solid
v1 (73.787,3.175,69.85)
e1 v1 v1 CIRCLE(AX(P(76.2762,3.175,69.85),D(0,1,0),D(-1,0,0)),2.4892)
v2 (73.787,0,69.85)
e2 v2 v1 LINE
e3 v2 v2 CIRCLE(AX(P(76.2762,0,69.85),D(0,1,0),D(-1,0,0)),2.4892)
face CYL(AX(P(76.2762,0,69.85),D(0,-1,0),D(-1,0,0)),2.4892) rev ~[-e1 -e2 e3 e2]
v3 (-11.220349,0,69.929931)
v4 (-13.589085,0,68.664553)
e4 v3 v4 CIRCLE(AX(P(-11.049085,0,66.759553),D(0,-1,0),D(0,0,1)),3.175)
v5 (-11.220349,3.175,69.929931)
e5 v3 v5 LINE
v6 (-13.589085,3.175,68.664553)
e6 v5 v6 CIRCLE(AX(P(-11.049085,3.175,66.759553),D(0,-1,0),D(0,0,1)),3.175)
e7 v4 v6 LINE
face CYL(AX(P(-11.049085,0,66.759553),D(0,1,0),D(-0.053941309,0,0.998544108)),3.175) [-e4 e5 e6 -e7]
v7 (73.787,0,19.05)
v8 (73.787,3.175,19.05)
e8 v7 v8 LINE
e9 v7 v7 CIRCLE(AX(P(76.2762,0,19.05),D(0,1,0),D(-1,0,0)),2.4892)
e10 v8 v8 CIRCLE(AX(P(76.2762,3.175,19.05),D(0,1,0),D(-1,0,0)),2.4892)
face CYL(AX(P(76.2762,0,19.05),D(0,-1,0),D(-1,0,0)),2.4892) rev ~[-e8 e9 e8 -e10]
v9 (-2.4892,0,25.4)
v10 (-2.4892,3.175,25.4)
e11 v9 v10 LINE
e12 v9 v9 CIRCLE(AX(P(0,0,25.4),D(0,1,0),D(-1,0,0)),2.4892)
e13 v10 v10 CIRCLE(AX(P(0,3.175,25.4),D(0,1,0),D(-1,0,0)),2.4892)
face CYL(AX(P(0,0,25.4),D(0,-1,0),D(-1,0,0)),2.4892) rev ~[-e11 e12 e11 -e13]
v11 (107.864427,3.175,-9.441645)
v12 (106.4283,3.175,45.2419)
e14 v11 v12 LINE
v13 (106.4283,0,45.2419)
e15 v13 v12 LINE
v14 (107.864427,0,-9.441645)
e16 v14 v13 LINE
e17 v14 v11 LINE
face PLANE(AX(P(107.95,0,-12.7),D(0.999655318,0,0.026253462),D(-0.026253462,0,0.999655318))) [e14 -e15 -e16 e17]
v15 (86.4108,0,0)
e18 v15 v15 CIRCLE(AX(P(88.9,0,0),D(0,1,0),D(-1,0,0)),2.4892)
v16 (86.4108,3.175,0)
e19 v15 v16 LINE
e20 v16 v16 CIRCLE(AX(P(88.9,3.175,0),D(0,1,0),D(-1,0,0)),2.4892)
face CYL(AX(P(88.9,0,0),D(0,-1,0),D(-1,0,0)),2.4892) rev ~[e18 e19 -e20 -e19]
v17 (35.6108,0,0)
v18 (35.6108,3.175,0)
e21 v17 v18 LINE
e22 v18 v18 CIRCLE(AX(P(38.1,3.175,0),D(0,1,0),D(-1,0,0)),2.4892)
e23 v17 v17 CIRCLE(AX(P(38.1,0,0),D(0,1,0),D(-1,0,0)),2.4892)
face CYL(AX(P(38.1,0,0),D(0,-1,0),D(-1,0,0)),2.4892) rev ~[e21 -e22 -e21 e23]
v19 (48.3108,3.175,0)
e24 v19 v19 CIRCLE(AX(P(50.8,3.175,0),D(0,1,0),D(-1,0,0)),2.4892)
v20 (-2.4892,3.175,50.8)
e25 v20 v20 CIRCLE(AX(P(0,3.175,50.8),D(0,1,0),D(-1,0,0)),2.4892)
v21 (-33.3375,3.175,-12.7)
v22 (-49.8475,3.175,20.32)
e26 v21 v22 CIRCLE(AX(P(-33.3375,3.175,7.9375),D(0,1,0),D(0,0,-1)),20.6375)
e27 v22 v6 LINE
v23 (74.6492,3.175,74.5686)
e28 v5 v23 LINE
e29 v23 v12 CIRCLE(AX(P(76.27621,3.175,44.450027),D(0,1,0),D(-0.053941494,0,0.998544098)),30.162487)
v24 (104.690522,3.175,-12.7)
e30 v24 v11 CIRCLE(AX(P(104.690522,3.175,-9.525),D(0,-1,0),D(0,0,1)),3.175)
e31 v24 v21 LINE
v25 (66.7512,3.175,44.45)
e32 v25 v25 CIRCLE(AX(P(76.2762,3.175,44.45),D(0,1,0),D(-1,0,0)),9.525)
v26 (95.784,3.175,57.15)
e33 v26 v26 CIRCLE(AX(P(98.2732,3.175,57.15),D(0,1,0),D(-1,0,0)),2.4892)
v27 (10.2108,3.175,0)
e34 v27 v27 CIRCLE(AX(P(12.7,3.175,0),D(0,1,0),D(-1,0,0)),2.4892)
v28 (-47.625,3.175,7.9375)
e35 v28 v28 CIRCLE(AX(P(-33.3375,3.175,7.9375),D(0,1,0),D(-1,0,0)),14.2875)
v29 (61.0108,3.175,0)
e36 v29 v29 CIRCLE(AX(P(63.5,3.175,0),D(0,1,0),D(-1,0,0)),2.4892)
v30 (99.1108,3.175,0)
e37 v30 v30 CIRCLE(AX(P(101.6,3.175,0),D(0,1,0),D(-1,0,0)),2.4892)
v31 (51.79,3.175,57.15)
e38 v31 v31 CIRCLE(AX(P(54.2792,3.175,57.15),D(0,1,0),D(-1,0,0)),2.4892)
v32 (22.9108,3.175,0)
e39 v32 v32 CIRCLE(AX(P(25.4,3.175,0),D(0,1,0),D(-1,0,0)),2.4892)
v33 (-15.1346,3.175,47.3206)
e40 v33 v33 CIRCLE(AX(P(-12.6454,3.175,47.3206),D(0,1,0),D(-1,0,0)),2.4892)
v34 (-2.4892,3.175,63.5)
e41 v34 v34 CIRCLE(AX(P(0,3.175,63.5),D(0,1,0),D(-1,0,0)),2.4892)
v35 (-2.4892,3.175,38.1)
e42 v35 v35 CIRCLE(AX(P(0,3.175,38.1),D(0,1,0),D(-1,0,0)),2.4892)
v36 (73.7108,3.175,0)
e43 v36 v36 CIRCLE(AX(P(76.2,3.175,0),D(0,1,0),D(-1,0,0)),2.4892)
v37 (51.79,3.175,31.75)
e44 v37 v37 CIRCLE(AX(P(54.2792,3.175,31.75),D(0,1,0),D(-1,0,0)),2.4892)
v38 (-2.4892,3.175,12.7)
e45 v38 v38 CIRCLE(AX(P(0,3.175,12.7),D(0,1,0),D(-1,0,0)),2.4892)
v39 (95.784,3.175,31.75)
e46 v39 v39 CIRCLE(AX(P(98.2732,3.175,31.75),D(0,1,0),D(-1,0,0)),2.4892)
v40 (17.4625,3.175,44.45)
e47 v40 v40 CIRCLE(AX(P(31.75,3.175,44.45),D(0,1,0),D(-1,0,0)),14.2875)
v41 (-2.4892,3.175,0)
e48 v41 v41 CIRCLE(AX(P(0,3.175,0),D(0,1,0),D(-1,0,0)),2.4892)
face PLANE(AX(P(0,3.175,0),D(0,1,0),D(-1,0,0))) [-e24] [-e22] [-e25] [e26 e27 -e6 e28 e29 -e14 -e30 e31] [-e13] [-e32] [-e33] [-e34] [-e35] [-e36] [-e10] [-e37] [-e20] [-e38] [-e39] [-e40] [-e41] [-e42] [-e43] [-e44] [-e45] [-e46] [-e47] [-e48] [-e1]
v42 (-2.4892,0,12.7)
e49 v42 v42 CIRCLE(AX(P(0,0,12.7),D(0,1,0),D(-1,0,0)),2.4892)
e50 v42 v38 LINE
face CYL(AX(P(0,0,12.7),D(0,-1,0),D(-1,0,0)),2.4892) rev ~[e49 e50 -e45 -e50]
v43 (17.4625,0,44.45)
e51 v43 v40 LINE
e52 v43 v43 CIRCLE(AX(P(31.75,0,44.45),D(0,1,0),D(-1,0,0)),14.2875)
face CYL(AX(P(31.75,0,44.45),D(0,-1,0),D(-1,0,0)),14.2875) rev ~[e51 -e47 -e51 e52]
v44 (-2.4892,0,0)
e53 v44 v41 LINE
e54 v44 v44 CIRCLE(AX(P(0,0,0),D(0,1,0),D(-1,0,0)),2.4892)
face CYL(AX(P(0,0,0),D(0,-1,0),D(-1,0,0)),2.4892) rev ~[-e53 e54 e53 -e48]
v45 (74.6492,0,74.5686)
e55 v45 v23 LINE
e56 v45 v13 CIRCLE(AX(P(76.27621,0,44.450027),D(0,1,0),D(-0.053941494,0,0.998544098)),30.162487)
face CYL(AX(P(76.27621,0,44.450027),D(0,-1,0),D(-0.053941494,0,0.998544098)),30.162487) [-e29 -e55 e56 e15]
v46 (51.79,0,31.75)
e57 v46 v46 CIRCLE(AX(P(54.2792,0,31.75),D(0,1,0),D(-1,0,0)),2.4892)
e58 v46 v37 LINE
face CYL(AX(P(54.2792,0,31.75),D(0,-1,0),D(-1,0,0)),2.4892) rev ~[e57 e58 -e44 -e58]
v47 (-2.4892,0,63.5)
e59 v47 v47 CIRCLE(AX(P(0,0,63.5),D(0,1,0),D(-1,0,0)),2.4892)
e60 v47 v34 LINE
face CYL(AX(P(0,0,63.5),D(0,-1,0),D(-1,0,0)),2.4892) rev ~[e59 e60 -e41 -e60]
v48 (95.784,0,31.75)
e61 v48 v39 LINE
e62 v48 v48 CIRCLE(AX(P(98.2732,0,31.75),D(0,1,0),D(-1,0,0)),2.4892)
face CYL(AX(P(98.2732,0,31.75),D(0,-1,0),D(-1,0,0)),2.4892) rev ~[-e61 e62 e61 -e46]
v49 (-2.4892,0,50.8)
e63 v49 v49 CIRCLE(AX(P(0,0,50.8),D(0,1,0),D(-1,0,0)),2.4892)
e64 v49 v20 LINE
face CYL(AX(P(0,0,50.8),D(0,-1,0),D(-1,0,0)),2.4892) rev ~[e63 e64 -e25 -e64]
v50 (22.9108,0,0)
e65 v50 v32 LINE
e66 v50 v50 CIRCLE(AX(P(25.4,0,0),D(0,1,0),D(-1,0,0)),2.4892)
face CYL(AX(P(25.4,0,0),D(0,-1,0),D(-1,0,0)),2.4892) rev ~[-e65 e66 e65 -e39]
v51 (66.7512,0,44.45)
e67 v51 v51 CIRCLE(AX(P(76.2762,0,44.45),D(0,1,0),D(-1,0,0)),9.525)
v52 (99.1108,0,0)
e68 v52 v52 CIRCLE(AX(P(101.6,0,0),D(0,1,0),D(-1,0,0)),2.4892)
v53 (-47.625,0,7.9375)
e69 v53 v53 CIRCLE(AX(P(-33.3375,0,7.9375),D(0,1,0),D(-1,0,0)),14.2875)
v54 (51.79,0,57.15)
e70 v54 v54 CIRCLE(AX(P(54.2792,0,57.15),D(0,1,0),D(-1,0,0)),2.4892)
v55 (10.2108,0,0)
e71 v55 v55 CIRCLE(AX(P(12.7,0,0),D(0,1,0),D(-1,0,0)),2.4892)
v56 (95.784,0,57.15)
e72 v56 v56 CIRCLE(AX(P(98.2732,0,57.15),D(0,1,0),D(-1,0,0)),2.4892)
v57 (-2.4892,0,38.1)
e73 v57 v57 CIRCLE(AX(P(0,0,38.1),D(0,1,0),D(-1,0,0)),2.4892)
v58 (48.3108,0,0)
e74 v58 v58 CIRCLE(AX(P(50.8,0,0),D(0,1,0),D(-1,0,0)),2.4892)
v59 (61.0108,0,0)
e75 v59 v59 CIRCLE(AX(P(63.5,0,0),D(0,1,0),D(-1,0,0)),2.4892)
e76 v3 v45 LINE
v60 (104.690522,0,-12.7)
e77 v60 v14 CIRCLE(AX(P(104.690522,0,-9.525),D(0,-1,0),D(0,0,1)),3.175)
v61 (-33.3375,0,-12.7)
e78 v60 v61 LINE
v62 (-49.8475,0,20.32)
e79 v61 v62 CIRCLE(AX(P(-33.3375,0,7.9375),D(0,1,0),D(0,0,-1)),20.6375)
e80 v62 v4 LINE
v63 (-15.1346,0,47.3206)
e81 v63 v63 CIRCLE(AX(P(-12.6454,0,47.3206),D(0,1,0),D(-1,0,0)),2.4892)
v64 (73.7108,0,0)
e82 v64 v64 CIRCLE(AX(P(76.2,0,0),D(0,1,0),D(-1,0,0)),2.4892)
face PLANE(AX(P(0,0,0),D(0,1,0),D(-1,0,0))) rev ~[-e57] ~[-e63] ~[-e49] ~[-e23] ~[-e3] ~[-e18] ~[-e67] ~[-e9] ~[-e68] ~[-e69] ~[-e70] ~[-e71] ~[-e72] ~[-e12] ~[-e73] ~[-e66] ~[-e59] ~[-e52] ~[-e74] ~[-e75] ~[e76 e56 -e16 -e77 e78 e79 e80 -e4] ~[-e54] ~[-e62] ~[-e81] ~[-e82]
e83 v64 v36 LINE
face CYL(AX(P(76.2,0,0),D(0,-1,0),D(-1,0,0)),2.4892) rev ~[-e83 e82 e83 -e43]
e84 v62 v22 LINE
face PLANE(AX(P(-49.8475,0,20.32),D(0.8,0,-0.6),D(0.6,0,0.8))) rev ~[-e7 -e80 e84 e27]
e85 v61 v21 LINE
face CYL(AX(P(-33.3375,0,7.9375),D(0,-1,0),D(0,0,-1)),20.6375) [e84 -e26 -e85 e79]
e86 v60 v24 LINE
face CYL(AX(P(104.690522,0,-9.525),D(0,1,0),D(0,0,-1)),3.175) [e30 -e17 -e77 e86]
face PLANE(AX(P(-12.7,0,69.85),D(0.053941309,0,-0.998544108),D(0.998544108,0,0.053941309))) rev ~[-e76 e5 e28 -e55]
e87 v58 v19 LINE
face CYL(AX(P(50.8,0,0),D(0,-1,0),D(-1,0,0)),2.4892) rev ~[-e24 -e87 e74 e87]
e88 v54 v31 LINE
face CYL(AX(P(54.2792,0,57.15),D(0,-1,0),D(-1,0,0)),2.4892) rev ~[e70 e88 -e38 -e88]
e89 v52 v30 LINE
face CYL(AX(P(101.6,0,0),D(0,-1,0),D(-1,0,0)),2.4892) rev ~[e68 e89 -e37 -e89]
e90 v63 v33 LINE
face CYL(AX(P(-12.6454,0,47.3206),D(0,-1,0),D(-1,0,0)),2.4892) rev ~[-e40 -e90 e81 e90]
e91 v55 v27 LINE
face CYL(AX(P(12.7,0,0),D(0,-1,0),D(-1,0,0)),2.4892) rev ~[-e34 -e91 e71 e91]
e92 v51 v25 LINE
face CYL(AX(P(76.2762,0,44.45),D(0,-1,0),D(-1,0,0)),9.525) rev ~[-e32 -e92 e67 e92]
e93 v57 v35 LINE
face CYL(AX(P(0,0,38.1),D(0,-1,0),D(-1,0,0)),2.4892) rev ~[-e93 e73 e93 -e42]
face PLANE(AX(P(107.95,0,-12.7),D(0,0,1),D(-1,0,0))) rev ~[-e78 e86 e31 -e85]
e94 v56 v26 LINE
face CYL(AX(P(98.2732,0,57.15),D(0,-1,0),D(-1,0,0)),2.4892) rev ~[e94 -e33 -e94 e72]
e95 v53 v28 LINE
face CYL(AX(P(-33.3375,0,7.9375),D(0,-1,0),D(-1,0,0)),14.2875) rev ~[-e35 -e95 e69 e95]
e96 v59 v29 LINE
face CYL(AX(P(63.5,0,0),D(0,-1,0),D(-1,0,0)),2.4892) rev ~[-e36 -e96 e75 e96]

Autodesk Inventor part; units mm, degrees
ref_plane "YZ Plane" through (0, 0, 0) normal (1, 0, 0) x (0, 1, 0)
ref_plane "XZ Plane" through (0, 0, 0) normal (0, 1, 0) x (-1, 0, 0)
ref_plane "XY Plane" through (0, 0, 0) normal (0, 0, 1) x (1, 0, 0)
sketch "CIM" plane through (0, 0, 0) normal (0, 0, 1) x (1, 0, 0)
  circle A0 centre (0, 0) radius 32.004
  circle A1 centre (0, 0) radius 9.525
  circle A2 centre (0, 25.4) radius 2.4892
  circle A3 centre (0, -25.4) radius 2.4892
  dimension "d0" = 64.008
  dimension "d1" = 19.05
  dimension "d2" = 4.9784
  dimension "d5" = 360
  dimension "d7" = 50.8
sketch "VersaKey Patern" plane through (0, 0, 0) normal (0, 0, 1) x (1, 0, 0)
  circle A0 centre (20.6222, 11.9063) radius 2.15
  arc A1 (5.2753, 19.7857) -> (5.9367, 18.5743) centre (6.2412, 19.5268) ccw
  arc A2 (13.1353, 14.4122) -> (14.5161, 14.4442) centre (13.809, 15.1513) ccw
  arc A3 (13.1353, 14.4122) -> (5.9367, 18.5743) centre (0, 0) ccw
  line L0 (5.2753, 19.7857) -> (6.3115, 23.653)
  line L1 (17.347, 17.2752) -> (14.5161, 14.4442)
  arc A4 (7.5745, 24.3491) -> (6.3115, 23.653) centre (7.2774, 23.3942) ccw
  arc A5 (17.3191, 18.7163) -> (7.5745, 24.3491) centre (0, 0) ccw
  arc A6 (17.347, 17.2752) -> (17.3191, 18.7163) centre (16.6399, 17.9823) ccw
  circle A7 centre (-20.6222, 11.9062) radius 2.15
  arc A8 (-14.4973, 14.4613) -> (-13.1175, 14.4285) centre (-13.7902, 15.1684) ccw
  arc A9 (-5.9137, 18.5817) -> (-13.1175, 14.4285) centre (0, 0) ccw
  line L2 (-14.4973, 14.4613) -> (-17.3284, 17.2924)
  arc A10 (-5.9137, 18.5817) -> (-5.251, 19.7934) centre (-6.217, 19.5346) ccw
  arc A11 (-17.2997, 18.7342) -> (-17.3284, 17.2924) centre (-16.6213, 17.9996) ccw
  circle A12 centre (0, 23.8125) radius 2.15
  line L3 (-6.2872, 23.6606) -> (-5.251, 19.7934)
  arc A13 (-7.5492, 24.3569) -> (-17.2997, 18.7342) centre (0, 0) ccw
  arc A14 (-6.2872, 23.6606) -> (-7.5492, 24.3569) centre (-7.2532, 23.4017) ccw
  circle A15 centre (20.6222, -11.9062) radius 2.15
  circle A16 centre (0, -23.8125) radius 2.15
  circle A17 centre (-20.6222, -11.9063) radius 2.15
  arc A18 (-13.1353, -14.4122) -> (-14.5161, -14.4442) centre (-13.809, -15.1513) ccw
  arc A19 (5.9137, -18.5817) -> (5.251, -19.7934) centre (6.217, -19.5346) ccw
  line L4 (6.2872, -23.6606) -> (5.251, -19.7934)
  arc A20 (-13.1353, -14.4122) -> (-5.9367, -18.5743) centre (0, 0) ccw
  arc A21 (-5.2753, -19.7857) -> (-5.9367, -18.5743) centre (-6.2412, -19.5268) ccw
  line L5 (-5.2753, -19.7857) -> (-6.3115, -23.653)
  arc A22 (-7.5745, -24.3491) -> (-6.3115, -23.653) centre (-7.2774, -23.3942) ccw
  arc A23 (-17.347, -17.2752) -> (-17.3191, -18.7163) centre (-16.6399, -17.9823) ccw
  arc A24 (-17.3191, -18.7163) -> (-7.5745, -24.3491) centre (0, 0) ccw
  line L6 (-17.347, -17.2752) -> (-14.5161, -14.4442)
  arc A25 (14.4973, -14.4613) -> (13.1175, -14.4285) centre (13.7902, -15.1684) ccw
  arc A26 (5.9137, -18.5817) -> (13.1175, -14.4285) centre (0, 0) ccw
  line L7 (14.4973, -14.4613) -> (17.3284, -17.2924)
  arc A27 (17.2997, -18.7342) -> (17.3284, -17.2924) centre (16.6213, -17.9996) ccw
  arc A28 (7.5492, -24.3569) -> (17.2997, -18.7342) centre (0, 0) ccw
  arc A29 (6.2872, -23.6606) -> (7.5492, -24.3569) centre (7.2532, -23.4017) ccw
  arc A30 (-19.049, 4.1694) -> (-19.7671, 5.3492) centre (-20.0259, 4.3832) ccw
  arc A31 (-19.049, 4.1694) -> (-19.0542, -4.1458) centre (0, 0) ccw
  arc A32 (-19.7725, -5.3243) -> (-19.0542, -4.1458) centre (-20.0313, -4.3584) ccw
  line L8 (-23.6343, 6.3854) -> (-19.7671, 5.3492)
  arc A33 (-23.6343, 6.3854) -> (-24.8683, 5.6407) centre (-23.8931, 5.4194) ccw
  arc A34 (-24.8683, 5.6407) -> (-24.8742, -5.6148) centre (0, 0) ccw
  line L9 (-19.7725, -5.3243) -> (-23.6399, -6.3606)
  arc A35 (-24.8742, -5.6148) -> (-23.6399, -6.3606) centre (-23.8987, -5.3947) ccw
  arc A36 (19.7725, 5.3243) -> (19.0542, 4.1458) centre (20.0313, 4.3584) ccw
  line L10 (19.7725, 5.3243) -> (23.6399, 6.3606)
  arc A37 (19.049, -4.1694) -> (19.0542, 4.1458) centre (0, 0) ccw
  arc A38 (19.049, -4.1694) -> (19.7671, -5.3492) centre (20.0259, -4.3832) ccw
  line L11 (23.6343, -6.3854) -> (19.7671, -5.3492)
  arc A39 (23.6343, -6.3854) -> (24.8683, -5.6407) centre (23.8931, -5.4194) ccw
  arc A40 (24.8683, -5.6407) -> (24.8742, 5.6148) centre (0, 0) ccw
  arc A41 (24.8742, 5.6148) -> (23.6399, 6.3606) centre (23.8987, 5.3947) ccw
  point P0 (0, 0)
sketch "WCP Gearbox Mounting Pattern" plane through (0, 0, 0) normal (0, 0, 1) x (1, 0, 0)
  circle A0 centre (0, 29.0812) radius 14.2875
  circle A1 centre (-23.8125, 29.0812) radius 2.0193
  circle A2 centre (-57.15, 29.0812) radius 9.525
  circle A3 centre (-57.15, 29.0812) radius 2.4892
  circle A4 centre (23.8125, 29.0812) radius 2.0193
  circle A5 centre (57.15, 29.0812) radius 9.525
  circle A6 centre (57.15, 29.0812) radius 2.4892
  dimension "d43" = 28.575
  dimension "d46" = 360
  dimension "d48" = 19.05
  dimension "d49" = 4.9784
  dimension "d50" = 4.0386
  dimension "d51" = 47.625
  dimension "d52" = 114.3
sketch "VersaPlanatery Mounting Pattern" plane through (0, 0, 0) normal (0, 0, 1) x (1, 0, 0)
  line L0 (21.9459, 48.1771) -> (-22.5041, 48.1771)
  line L1 (-22.5041, 48.1771) -> (-22.5041, 3.7271)
  line L2 (-22.5041, 3.7271) -> (21.9459, 3.7271)
  line L3 (21.9459, 3.7271) -> (21.9459, 48.1771)
  line L4 (21.9459, 48.1771) -> (-22.5041, 3.7271) construction
  line L5 (-22.5041, 48.1771) -> (21.9459, 3.7271) construction
  circle A0 centre (-0.2791, 25.9521) radius 14.2875
  circle A1 centre (17.6814, 43.9126) radius 2.4892
  circle A2 centre (-18.2396, 43.9126) radius 2.4892
  circle A3 centre (-18.2396, 7.9916) radius 2.4892
  circle A4 centre (17.6814, 7.9916) radius 2.4892
  point P0 (0.3196, 26.5508)
  dimension "d55" = 44.45
  dimension "d56" = 44.45
  dimension "d57" = 28.575
  dimension "d58" = 4.9784
  dimension "d61" = 360
  dimension "d63" = 50.8
sketch "1.875in Flat Hex Bearing Mount" plane through (0, 0, 0) normal (0, 0, 1) x (1, 0, 0)
  circle A0 centre (-2.1559, 26.2) radius 14.2875
  circle A1 centre (21.6566, 26.2) radius 2.4892
  circle A2 centre (14.6821, 43.0379) radius 2.4892
  circle A3 centre (-18.9938, 43.0379) radius 2.4892
  circle A4 centre (-18.9938, 9.362) radius 2.4892
  circle A5 centre (14.6821, 9.362) radius 2.4892
  circle A6 centre (-25.9684, 26.2) radius 2.4892
  point P0 (-2.1559, 26.2)
  dimension "d66" = 28.575
  dimension "d67" = 4.9784
  dimension "d68" = 4.9784
  dimension "d71" = 360
  dimension "d75" = 360
  dimension "d77" = 47.625
  dimension "d78" = 47.625
sketch "2in Box Tube IsoGrid Pocket Pattern" plane through (0, 0, 0) normal (0, 0, 1) x (1, 0, 0)
  circle A0 centre (-0.1285, 44.8116) radius 2.4892
  line L0 (-6.7243, 60.9984) -> (-2.1082, 53.0031)
  line L1 (1.8513, 53.0031) -> (6.4673, 60.9984)
  line L2 (4.4876, 64.4274) -> (-4.7446, 64.4274)
  line L3 (-25.5285, 70.2116) -> (25.2715, 70.2116) construction
  line L4 (-25.5285, 19.4116) -> (25.2715, 19.4116) construction
  arc A1 (-4.7446, 64.4274) -> (-6.7243, 60.9984) centre (-4.7446, 62.1414) ccw
  arc A2 (6.4673, 60.9984) -> (4.4876, 64.4274) centre (4.4876, 62.1414) ccw
  arc A3 (-2.1082, 53.0031) -> (1.8513, 53.0031) centre (-0.1285, 54.1461) ccw
  line L5 (-17.4446, 47.1928) -> (-8.2124, 47.1928)
  line L6 (-6.2327, 50.6218) -> (-10.8487, 58.6171)
  line L7 (-14.8082, 58.6171) -> (-19.4243, 50.6218)
  arc A4 (-19.4243, 50.6218) -> (-17.4446, 47.1928) centre (-17.4446, 49.4788) ccw
  arc A5 (-10.8487, 58.6171) -> (-14.8082, 58.6171) centre (-12.8285, 57.4741) ccw
  arc A6 (-8.2124, 47.1928) -> (-6.2327, 50.6218) centre (-8.2124, 49.4788) ccw
  line L8 (-10.8487, 31.006) -> (-6.2327, 39.0013)
  line L9 (-8.2124, 42.4303) -> (-17.4446, 42.4303)
  line L10 (-19.4243, 39.0013) -> (-14.8082, 31.006)
  arc A7 (-14.8082, 31.006) -> (-10.8487, 31.006) centre (-12.8285, 32.149) ccw
  arc A8 (-17.4446, 42.4303) -> (-19.4243, 39.0013) centre (-17.4446, 40.1443) ccw
  arc A9 (-6.2327, 39.0013) -> (-8.2124, 42.4303) centre (-8.2124, 40.1443) ccw
  line L11 (6.4673, 28.6248) -> (1.8513, 36.6201)
  line L12 (-2.1082, 36.6201) -> (-6.7243, 28.6248)
  line L13 (-4.7446, 25.1958) -> (4.4876, 25.1958)
  arc A10 (4.4876, 25.1958) -> (6.4673, 28.6248) centre (4.4876, 27.4818) ccw
  arc A11 (-6.7243, 28.6248) -> (-4.7446, 25.1958) centre (-4.7446, 27.4818) ccw
  arc A12 (1.8513, 36.6201) -> (-2.1082, 36.6201) centre (-0.1285, 35.4771) ccw
  line L14 (17.1876, 42.4303) -> (7.9554, 42.4303)
  line L15 (5.9757, 39.0013) -> (10.5918, 31.006)
  line L16 (14.5513, 31.006) -> (19.1673, 39.0013)
  arc A13 (19.1673, 39.0013) -> (17.1876, 42.4303) centre (17.1876, 40.1443) ccw
  arc A14 (10.5918, 31.006) -> (14.5513, 31.006) centre (12.5715, 32.149) ccw
  arc A15 (7.9554, 42.4303) -> (5.9757, 39.0013) centre (7.9554, 40.1443) ccw
  line L17 (10.5918, 58.6171) -> (5.9757, 50.6218)
  line L18 (7.9554, 47.1928) -> (17.1876, 47.1928)
  line L19 (19.1673, 50.6218) -> (14.5513, 58.6171)
  arc A16 (14.5513, 58.6171) -> (10.5918, 58.6171) centre (12.5715, 57.4741) ccw
  arc A17 (17.1876, 47.1928) -> (19.1673, 50.6218) centre (17.1876, 49.4788) ccw
  arc A18 (5.9757, 50.6218) -> (7.9554, 47.1928) centre (7.9554, 49.4788) ccw
  circle A19 centre (12.5715, 63.8616) radius 2.4892
  circle A20 centre (-25.5285, 44.8116) radius 2.4892
  circle A21 centre (25.2715, 44.8116) radius 2.4892
  line L20 (-0.1285, 44.8116) -> (-0.1285, 38.8093) construction
  line L21 (-0.1285, 44.8116) -> (3.6274, 44.8116) construction
  circle A22 centre (-12.8285, 63.8616) radius 2.4892
  circle A23 centre (12.5715, 25.7616) radius 2.4892
  circle A24 centre (-12.8285, 25.7616) radius 2.4892
  dimension "d83" = 4.9784
  dimension "d90" = 50.8
  dimension "d91" = 5.7842
  dimension "d93" = 2.286
  dimension "d96" = 360
  dimension "d98" = 4.7625
  dimension "d99" = 6.35
  dimension "d104" = 25.4
  dimension "d105" = 5.7842
  dimension "d108" = 25.4
  dimension "d115" = 25.4
  dimension "d160" = 8.0839
  dimension "d161" = 8.0839
sketch "2in Box Tube 4 Triangle Pocket Pattern" plane through (0, 0, 0) normal (0, 0, 1) x (1, 0, 0)
  circle A0 centre (-0.7121, 31.493) radius 2.4892
  line L0 (-11.3406, 52.1305) -> (9.9163, 52.1305)
  line L1 (11.5328, 48.228) -> (0.9043, 37.5996)
  line L2 (-2.3286, 37.5996) -> (-12.9571, 48.228)
  arc A1 (-11.3406, 52.1305) -> (-12.9571, 48.228) centre (-11.3406, 49.8445) ccw
  arc A2 (-2.3286, 37.5996) -> (0.9043, 37.5996) centre (-0.7121, 39.216) ccw
  arc A3 (11.5328, 48.228) -> (9.9163, 52.1305) centre (9.9163, 49.8445) ccw
  line L3 (-21.3496, 20.8645) -> (-21.3496, 42.1215)
  line L4 (-17.4472, 43.7379) -> (-6.8187, 33.1094)
  line L5 (-6.8187, 29.8765) -> (-17.4472, 19.2481)
  arc A4 (-21.3496, 20.8645) -> (-17.4472, 19.2481) centre (-19.0636, 20.8645) ccw
  arc A5 (-6.8187, 29.8765) -> (-6.8187, 33.1094) centre (-8.4352, 31.493) ccw
  arc A6 (-17.4472, 43.7379) -> (-21.3496, 42.1215) centre (-19.0636, 42.1215) ccw
  line L6 (9.9163, 10.8555) -> (-11.3406, 10.8555)
  line L7 (-12.9571, 14.7579) -> (-2.3286, 25.3864)
  line L8 (0.9043, 25.3864) -> (11.5328, 14.7579)
  arc A7 (9.9163, 10.8555) -> (11.5328, 14.7579) centre (9.9163, 13.1415) ccw
  arc A8 (0.9043, 25.3864) -> (-2.3286, 25.3864) centre (-0.7121, 23.77) ccw
  arc A9 (-12.9571, 14.7579) -> (-11.3406, 10.8555) centre (-11.3406, 13.1415) ccw
  line L9 (19.9254, 42.1215) -> (19.9254, 20.8645)
  line L10 (16.0229, 19.2481) -> (5.3944, 29.8765)
  line L11 (5.3944, 33.1094) -> (16.0229, 43.7379)
  arc A10 (19.9254, 42.1215) -> (16.0229, 43.7379) centre (17.6394, 42.1215) ccw
  arc A11 (5.3944, 33.1094) -> (5.3944, 29.8765) centre (7.0109, 31.493) ccw
  arc A12 (16.0229, 19.2481) -> (19.9254, 20.8645) centre (17.6394, 20.8645) ccw
  line L12 (-27.744, 56.893) -> (43.6702, 56.893) construction
  line L13 (-27.1477, 6.093) -> (28.101, 6.093) construction
  line L14 (48.5293, 25.3864) -> (59.1578, 14.7579) construction
  arc A13 (48.5293, 25.3864) -> (45.2964, 25.3864) centre (46.9129, 23.77) ccw construction
  line L15 (34.6679, 14.7579) -> (45.2964, 25.3864) construction
  arc A14 (40.8063, 29.8765) -> (40.8063, 33.1094) centre (39.1898, 31.493) ccw construction
  arc A15 (53.0194, 33.1094) -> (53.0194, 29.8765) centre (54.6359, 31.493) ccw construction
  circle A16 centre (46.9129, 31.493) radius 2.4892 construction
  arc A17 (26.2754, 20.8645) -> (30.1778, 19.2481) centre (28.5614, 20.8645) ccw construction
  line L16 (40.8063, 29.8765) -> (30.1778, 19.2481) construction
  line L17 (67.5504, 42.1215) -> (67.5504, 20.8645) construction
  line L18 (26.2754, 20.8645) -> (26.2754, 42.1215) construction
  line L19 (53.0194, 33.1094) -> (63.6479, 43.7379) construction
  line L20 (30.1778, 43.7379) -> (40.8063, 33.1094) construction
  line L21 (45.2964, 37.5996) -> (34.6679, 48.228) construction
  line L22 (36.2844, 52.1305) -> (57.5413, 52.1305) construction
  line L23 (57.5413, 10.8555) -> (36.2844, 10.8555) construction
  arc A18 (36.2844, 52.1305) -> (34.6679, 48.228) centre (36.2844, 49.8445) ccw construction
  line L24 (59.1578, 48.228) -> (48.5293, 37.5996) construction
  arc A19 (59.1578, 48.228) -> (57.5413, 52.1305) centre (57.5413, 49.8445) ccw construction
  arc A20 (45.2964, 37.5996) -> (48.5293, 37.5996) centre (46.9129, 39.216) ccw construction
  line L25 (63.6479, 19.2481) -> (53.0194, 29.8765) construction
  arc A21 (57.5413, 10.8555) -> (59.1578, 14.7579) centre (57.5413, 13.1415) ccw construction
  arc A22 (34.6679, 14.7579) -> (36.2844, 10.8555) centre (36.2844, 13.1415) ccw construction
  arc A23 (30.1778, 43.7379) -> (26.2754, 42.1215) centre (28.5614, 42.1215) ccw construction
  arc A24 (67.5504, 42.1215) -> (63.6479, 43.7379) centre (65.2644, 42.1215) ccw construction
  arc A25 (63.6479, 19.2481) -> (67.5504, 20.8645) centre (65.2644, 20.8645) ccw construction
  circle A26 centre (23.1004, 50.543) radius 2.4892
  circle A27 centre (23.1004, 13.1415) radius 2.4892
  line L26 (23.1004, 50.543) -> (23.1004, 13.1415) construction
  line L27 (-0.7121, 31.493) -> (-0.7121, 20.1913) construction
  circle A28 centre (-24.5246, 50.543) radius 2.4892
  circle A29 centre (-24.5246, 13.1415) radius 2.4892
  dimension "d134" = 4.9784
  dimension "d135" = 2.286
  dimension "d138" = 360
  dimension "d140" = 50.8
  dimension "d141" = 4.7625
  dimension "d142" = 4.7625
  dimension "d143" = 6.35
  dimension "d146" = 47.625
  dimension "d151" = 6.35
  dimension "d162" = 6.35
sketch "Bag Motor" plane through (0, 0, 0) normal (0, 0, 1) x (1, 0, 0)
  circle A0 centre (-0.9407, 22.0152) radius 20.32
  circle A1 centre (-0.9407, 22.0152) radius 6.0325
  circle A2 centre (-0.9407, 34.5152) radius 2.1
  circle A3 centre (-0.9407, 9.5152) radius 2.1
  point P0 (-0.9407, 22.0152)
  dimension "d165" = 360
  dimension "d167" = 12.065
  dimension "d168" = 25
  dimension "d169" = 4.2
  dimension "d170" = 40.64
sketch "775 Pro" plane through (0, 0, 0) normal (0, 0, 1) x (1, 0, 0)
  arc A0 (-4.434, 16.1665) -> (-14.5364, 8.3491) centre (0, 0) ccw
  arc A1 (-3.376, 12.3089) -> (-11.0678, 6.3569) centre (0, 0) ccw
  arc A2 (-3.376, 12.3089) -> (-4.434, 16.1665) centre (-3.905, 14.2377) ccw
  arc A3 (-14.5364, 8.3491) -> (-11.0678, 6.3569) centre (-12.8021, 7.353) ccw
  arc A4 (14.5364, 8.3491) -> (4.434, 16.1665) centre (0, 0) ccw
  arc A5 (11.0678, 6.3569) -> (3.376, 12.3089) centre (0, 0) ccw
  arc A6 (4.434, 16.1665) -> (3.376, 12.3089) centre (3.905, 14.2377) ccw
  arc A7 (11.0678, 6.3569) -> (14.5364, 8.3491) centre (12.8021, 7.353) ccw
  arc A8 (-11.0678, -6.3569) -> (-3.376, -12.3089) centre (0, 0) ccw
  arc A9 (-4.434, -16.1665) -> (-3.376, -12.3089) centre (-3.905, -14.2377) ccw
  arc A10 (-14.5364, -8.3491) -> (-4.434, -16.1665) centre (0, 0) ccw
  arc A11 (-11.0678, -6.3569) -> (-14.5364, -8.3491) centre (-12.8021, -7.353) ccw
  circle A12 centre (0, 0) radius 8.9535
  circle A13 centre (0, 0) radius 20.6375
  circle A14 centre (14.5, 0) radius 2.0193
  circle A15 centre (-14.5, 0) radius 2.0193
  arc A16 (14.5364, -8.3491) -> (11.0678, -6.3569) centre (12.8021, -7.353) ccw
  arc A17 (4.434, -16.1665) -> (14.5364, -8.3491) centre (0, 0) ccw
  arc A18 (3.376, -12.3089) -> (4.434, -16.1665) centre (3.905, -14.2377) ccw
  arc A19 (3.376, -12.3089) -> (11.0678, -6.3569) centre (0, 0) ccw
  dimension "d173" = 17.907
  dimension "d174" = 41.275
  dimension "d175" = 4.0386
  dimension "d176" = 360
  dimension "d177" = 29
  dimension "d178" = 4
  dimension "d179" = 360
  dimension "d180" = 3.81
  dimension "d181" = 7.81
  dimension "d182" = 360
sketch "Falcon 500" plane through (0, 0, 0) normal (0, 0, 1) x (1, 0, 0)
  circle A0 centre (0, 0) radius 30.1625 construction
  circle A1 centre (0, 0) radius 9.525
  circle A2 centre (0, 25.4) radius 2.4892
  circle A3 centre (0, -25.4) radius 2.4892
  circle A4 centre (21.997, -12.7) radius 2.4892
  circle A5 centre (21.997, 12.7) radius 2.4892
  circle A6 centre (0, 25.4) radius 2.4892
  circle A7 centre (-21.997, 12.7) radius 2.4892
  circle A8 centre (-21.997, -12.7) radius 2.4892
  dimension "d190" = 60.325
  dimension "d191" = 19.05
  dimension "d192" = 4.9784
  dimension "d193" = 360
  dimension "d194" = 50.8
  dimension "d195" = 360
sketch "Standardized T Gusset" plane through (0, 0, 0) normal (0, 0, 1) x (1, 0, 0)
  arc A0 (8.255, 15.5101) -> (16.1511, 6.9174) centre (17.7466, 16.3078) ccw construction
  line L0 (26.2828, 5.196) -> (16.1511, 6.9174) construction
  line L1 (25.4, 0) -> (-25.4, 0) construction
  arc A1 (-1.5954, -9.3904) -> (1.5954, -9.3904) centre (0, 0) ccw construction
  line L2 (26.2828, -5.196) -> (1.5954, -9.3904) construction
  circle A2 centre (25.4, 0) radius 2.4892
  arc A3 (26.2828, -5.196) -> (26.2828, 5.196) centre (25.4, 0) ccw construction
  arc A4 (-16.1511, 6.9174) -> (-8.255, 15.5101) centre (-17.7466, 16.3078) ccw construction
  circle A5 centre (-12.7, 0) radius 2.4892
  line L3 (-1.5954, -9.3904) -> (-26.2828, -5.196) construction
  line L4 (-26.2828, 5.196) -> (-16.1511, 6.9174) construction
  arc A6 (-26.2828, 5.196) -> (-26.2828, -5.196) centre (-25.4, 0) ccw construction
  circle A7 centre (-25.4, 0) radius 2.4892
  circle A8 centre (0, 25.4) radius 2.4892
  line L5 (-8.255, 15.5101) -> (-5.252, 51.2414) construction
  line L6 (0, 0) -> (0, 50.8) construction
  line L7 (8.255, 15.5101) -> (5.252, 51.2414) construction
  circle A9 centre (0, 38.1) radius 2.4892
  circle A10 centre (0, 50.8) radius 2.4892
  arc A11 (5.252, 51.2414) -> (-5.252, 51.2414) centre (0, 50.8) ccw construction
  circle A12 centre (0, 0) radius 2.4892
  circle A13 centre (12.7, 0) radius 2.4892
  point P0 (0, 11.5839)
  dimension "d214" = 4.9784
  dimension "d215" = 25.4
  dimension "d216" = 12.7
  dimension "d217" = 19.05
  dimension "d218" = 10.541
  dimension "d219" = 9.525
  dimension "d220" = 12.7
  dimension "d221" = 25.4
sketch "Standardized L Gusset" plane through (0, 0, 0) normal (0, 0, 1) x (1, 0, 0)
  line L0 (0, 0) -> (-25.4, 0) construction
  arc A0 (-16.1511, 6.9174) -> (-8.255, 15.5101) centre (-17.7466, 16.3078) ccw construction
  line L1 (-1.5954, -9.3904) -> (-26.2828, -5.196) construction
  line L2 (-26.2828, 5.196) -> (-16.1511, 6.9174) construction
  arc A1 (-26.2828, 5.196) -> (-26.2828, -5.196) centre (-25.4, 0) ccw construction
  circle A2 centre (0, 25.4) radius 2.4892
  line L3 (-8.255, 15.5101) -> (-5.252, 51.2414) construction
  line L4 (0, 0) -> (0, 50.8) construction
  line L5 (9.4915, 0.7977) -> (5.252, 51.2414) construction
  circle A3 centre (0, 38.1) radius 2.4892
  circle A4 centre (0, 50.8) radius 2.4892
  arc A5 (5.252, 51.2414) -> (-5.252, 51.2414) centre (0, 50.8) ccw construction
  circle A6 centre (-25.4, 0) radius 2.4892
  circle A7 centre (-12.7, 0) radius 2.4892
  circle A8 centre (0, 0) radius 2.4892
  arc A9 (-9.4915, 0.7977) -> (-9.525, 0) centre (0, 0) ccw
  arc A10 (-1.5954, -9.3904) -> (9.4915, 0.7977) centre (0, 0) ccw construction
  point P0 (-7.8691, 13.8492)
  dimension "d260" = 25.4
  dimension "d261" = 12.7
  dimension "d263" = 10.541
  dimension "d273" = 4.9784
  dimension "d276" = 12.7
  dimension "d281" = 9.525
  dimension "d282" = 9.525
sketch "Standardized X Gusset" plane through (0, 0, 0) normal (0, 0, 1) x (1, 0, 0)
  arc A0 (8.255, 15.5101) -> (16.1511, 6.9174) centre (17.7466, 16.3078) ccw construction
  line L0 (26.2828, 5.196) -> (16.1511, 6.9174) construction
  circle A1 centre (25.4, 0) radius 2.4892
  arc A2 (26.2828, -5.196) -> (26.2828, 5.196) centre (25.4, 0) ccw construction
  line L1 (25.4, 0) -> (-25.4, 0) construction
  line L2 (26.2828, -5.196) -> (16.1511, -6.9174) construction
  circle A3 centre (0, 0) radius 9.525 construction
  arc A4 (-16.1511, 6.9174) -> (-8.255, 15.5101) centre (-17.7466, 16.3078) ccw construction
  arc A5 (-8.255, -15.5101) -> (-16.1511, -6.9174) centre (-17.7466, -16.3078) ccw construction
  line L3 (-26.2828, 5.196) -> (-16.1511, 6.9174) construction
  circle A6 centre (-25.4, 0) radius 2.4892
  arc A7 (-26.2828, 5.196) -> (-26.2828, -5.196) centre (-25.4, 0) ccw construction
  circle A8 centre (-12.7, 0) radius 2.4892
  circle A9 centre (0, 25.4) radius 2.4892
  line L4 (-8.255, 15.5101) -> (-5.252, 51.2414) construction
  line L5 (8.255, 15.5101) -> (5.252, 51.2414) construction
  line L6 (0, 0) -> (0, 50.8) construction
  circle A10 centre (0, 38.1) radius 2.4892
  circle A11 centre (0, 0) radius 2.4892
  circle A12 centre (0, -25.4) radius 2.4892
  circle A13 centre (12.7, 0) radius 2.4892
  arc A14 (16.1511, -6.9174) -> (8.255, -15.5101) centre (17.7466, -16.3078) ccw construction
  circle A15 centre (0, -38.1) radius 2.4892
  circle A16 centre (0, -50.8) radius 2.4892
  arc A17 (-5.252, -51.2414) -> (5.252, -51.2414) centre (0, -50.8) ccw construction
  line L7 (8.255, -15.5101) -> (5.252, -51.2414) construction
  circle A18 centre (0, 50.8) radius 2.4892
  arc A19 (5.252, 51.2414) -> (-5.252, 51.2414) centre (0, 50.8) ccw construction
  line L8 (-8.255, -15.5101) -> (-5.252, -51.2414) construction
  line L9 (-16.1511, -6.9174) -> (-26.2828, -5.196) construction
  point P0 (0, 1.1165)
  dimension "d314" = 4.9784
  dimension "d315" = 25.4
  dimension "d316" = 12.7
  dimension "d317" = 19.05
  dimension "d318" = 10.541
  dimension "d319" = 9.525
  dimension "d320" = 12.7
  dimension "d321" = 25.4
  dimension "d322" = 12.7
  dimension "d323" = 25.4
sketch "Off-set X Gusset" plane through (0, 0, 0) normal (0, 0, 1) x (1, 0, 0)
  line L0 (19.05, 0) -> (-19.05, 0) construction
  line L1 (0, 0) -> (0, 50.8) construction
  circle A0 centre (0, 25.4) radius 2.4892
  circle A1 centre (0, 38.1) radius 2.4892
  circle A2 centre (0, 50.8) radius 2.4892
  arc A3 (5.252, 51.2414) -> (-5.252, 51.2414) centre (0, 50.8) ccw construction
  arc A4 (8.3262, 14.6635) -> (15.6905, 6.1768) centre (17.8177, 15.4612) ccw construction
  line L2 (-8.3262, 14.6635) -> (-5.252, 51.2414) construction
  line L3 (8.3262, 14.6635) -> (5.252, 51.2414) construction
  line L4 (20.2271, 5.1374) -> (15.6905, 6.1768) construction
  circle A5 centre (19.05, 0) radius 2.4892
  arc A6 (20.2271, -5.1374) -> (20.2271, 5.1374) centre (19.05, 0) ccw construction
  line L5 (20.2271, -5.1374) -> (15.6712, -6.1812) construction
  arc A7 (15.6712, -6.1812) -> (8.308, -14.6551) centre (17.7984, -15.4656) ccw construction
  circle A8 centre (0, -24.5934) radius 2.4892
  line L6 (-8.308, -14.6551) -> (-5.2514, -50.442) construction
  line L7 (8.308, -14.6551) -> (5.2514, -50.442) construction
  circle A9 centre (0, 0) radius 9.525 construction
  arc A10 (-20.2271, 5.1374) -> (-20.2271, -5.1374) centre (-19.05, 0) ccw construction
  line L8 (-15.6712, -6.1812) -> (-20.2271, -5.1374) construction
  arc A11 (-15.6905, 6.1768) -> (-8.3262, 14.6635) centre (-17.8177, 15.4612) ccw construction
  circle A12 centre (-6.35, 0) radius 2.4892
  circle A13 centre (6.35, 0) radius 2.4892
  line L9 (-20.2271, 5.1374) -> (-15.6905, 6.1768) construction
  circle A14 centre (-19.05, 0) radius 2.4892
  arc A15 (-8.308, -14.6551) -> (-15.6712, -6.1812) centre (-17.7984, -15.4656) ccw construction
  circle A16 centre (0, -37.2934) radius 2.4892
  circle A17 centre (0, -49.9934) radius 2.4892
  arc A18 (-5.2514, -50.442) -> (5.2514, -50.442) centre (0, -49.9934) ccw construction
  point P0 (0, 1.2591)
  dimension "d364" = 4.9784
  dimension "d365" = 25.4
  dimension "d366" = 12.7
  dimension "d367" = 19.05
  dimension "d368" = 10.541
  dimension "d369" = 9.525
  dimension "d370" = 12.7
  dimension "d371" = 19.05
  dimension "d372" = 12.7
  dimension "d373" = 25.4
sketch "Off-set T Gusset" plane through (0, 0, 0) normal (0, 0, 1) x (1, 0, 0)
  circle A0 centre (19.0537, -0.0772) radius 2.4892
  line L0 (0.0037, -0.0772) -> (0.0037, 50.7228) construction
  circle A1 centre (0.0037, 25.3228) radius 2.4892
  circle A2 centre (0.0037, 38.0228) radius 2.4892
  circle A3 centre (0.0037, 50.7228) radius 2.4892
  arc A4 (-2.1236, -9.3616) -> (2.1309, -9.3616) centre (0.0037, -0.0772) ccw construction
  arc A5 (5.2557, 51.1642) -> (-5.2483, 51.1642) centre (0.0037, 50.7228) ccw construction
  arc A6 (-20.2234, 5.0602) -> (-20.2234, -5.2145) centre (-19.0463, -0.0772) ccw construction
  arc A7 (20.2308, -5.2145) -> (20.2308, 5.0602) centre (19.0537, -0.0772) ccw construction
  line L1 (20.2308, -5.2145) -> (2.1309, -9.3616) construction
  line L2 (-2.1236, -9.3616) -> (-20.2234, -5.2145) construction
  line L3 (20.2308, 5.0602) -> (15.6942, 6.0996) construction
  line L4 (-20.2234, 5.0602) -> (-15.6868, 6.0996) construction
  line L5 (8.3299, 14.5863) -> (5.2557, 51.1642) construction
  line L6 (-8.3225, 14.5863) -> (-5.2483, 51.1642) construction
  arc A8 (8.3299, 14.5863) -> (15.6942, 6.0996) centre (17.8214, 15.3841) ccw construction
  arc A9 (-15.6868, 6.0996) -> (-8.3225, 14.5863) centre (-17.814, 15.3841) ccw construction
  line L7 (19.0537, -0.0772) -> (-19.0463, -0.0772) construction
  circle A10 centre (6.3537, -0.0772) radius 2.4892
  circle A11 centre (-6.3463, -0.0772) radius 2.4892
  circle A12 centre (-19.0463, -0.0772) radius 2.4892
  point P0 (0, 11.5839)
  dimension "d398" = 4.9784
  dimension "d399" = 25.4
  dimension "d400" = 12.7
  dimension "d401" = 19.05
  dimension "d402" = 10.541
  dimension "d403" = 9.525
  dimension "d405" = 19.05
  dimension "d417" = 12.7
sketch "Retained Bearing" plane through (0, 0, 0) normal (0, 0, 1) x (1, 0, 0)
  circle A0 centre (-51.0531, -16.1798) radius 14.2875
  circle A1 centre (-51.0531, -34.5948) radius 2.4892 construction
  circle A2 centre (-51.0531, -34.5948) radius 6.35 construction
  circle A3 centre (-35.1052, -6.9723) radius 2.4892 construction
  circle A4 centre (-35.1052, -6.9723) radius 6.35 construction
  circle A5 centre (-67.0009, -6.9723) radius 2.4892 construction
  circle A6 centre (-67.0009, -6.9723) radius 6.35 construction
  point P0 (-5.1155, 13.4934)
  dimension "d422" = 28.575
  dimension "d423" = 4.9784
  dimension "d424" = 12.7
  dimension "d426" = 18.415
  dimension "d429" = 360
sketch "Sketch21" plane through (0, 0, 0) normal (0, 1, 0) x (-1, 0, 0)
  circle A0 centre (0, 0) radius 2.4892
  line L0 (-1.1084, 0) -> (0, 0) construction
  line L1 (0, 0) -> (0, 1.1837) construction
  circle A1 centre (-12.7, 0) radius 2.4892
  circle A2 centre (-25.4, 0) radius 2.4892
  circle A3 centre (-38.1, 0) radius 2.4892
  circle A4 centre (-50.8, 0) radius 2.4892
  circle A5 centre (-63.5, 0) radius 2.4892
  circle A6 centre (0, 12.7) radius 2.4892
  circle A7 centre (0, 25.4) radius 2.4892
  circle A8 centre (0, 38.1) radius 2.4892
  circle A9 centre (0, 50.8) radius 2.4892
  circle A10 centre (0, 63.5) radius 2.4892
  circle A11 centre (-31.75, 44.45) radius 14.2875
  circle A12 centre (33.3375, 7.9375) radius 14.2875
  arc A13 (33.3375, -12.7) -> (49.8475, 20.32) centre (33.3375, 7.9375) ccw
  circle A14 centre (-76.2762, 44.45) radius 6.3881 construction
  circle A15 centre (-31.75, 44.45) radius 38.1381 construction
  circle A16 centre (-31.75, 44.45) radius 22.2339 construction
  line L2 (-107.95, -12.7) -> (33.3375, -12.7)
  line L3 (49.8475, 20.32) -> (12.7, 69.85)
  line L4 (-12.7, 65.1668) -> (-12.7, 12.7) construction
  line L5 (-12.7, 12.7) -> (-37.3935, 12.7) construction
  line L6 (-76.2762, 69.85) -> (-76.2762, 19.05) construction
  line L7 (12.7, 69.85) -> (-74.6492, 74.5686)
  line L8 (-107.95, -12.7) -> (-106.4283, 45.2419)
  arc A17 (-74.6492, 74.5686) -> (-106.4283, 45.2419) centre (-76.2762, 44.45) ccw
  circle A18 centre (-76.2, 0) radius 2.4892
  circle A19 centre (-88.9, 0) radius 2.4892
  circle A20 centre (-101.6, 0) radius 2.4892
  circle A21 centre (12.6454, 47.3206) radius 2.4892
  line L9 (-31.75, 44.45) -> (12.6454, 47.3206) construction
  line L10 (12.6454, 47.3206) -> (33.3375, 7.9375) construction
  circle A22 centre (12.6454, 47.3206) radius 6.35 construction
  circle A23 centre (-76.2762, 44.45) radius 30.1625 construction
  circle A24 centre (-76.2762, 44.45) radius 9.525
  circle A25 centre (-76.2762, 69.85) radius 2.4892
  circle A26 centre (-76.2762, 19.05) radius 2.4892
  circle A27 centre (-54.2792, 31.75) radius 2.4892
  circle A28 centre (-54.2792, 57.15) radius 2.4892
  circle A29 centre (-76.2762, 69.85) radius 2.4892
  circle A30 centre (-98.2732, 57.15) radius 2.4892
  circle A31 centre (-98.2732, 31.75) radius 2.4892
  dimension "d433" = 4.9784
  dimension "d436" = 12.7
  dimension "d443" = 12.7
  dimension "d448" = 28.575
  dimension "d449" = 6.35
  dimension "d451" = 12.7762
  dimension "d452" = 76.2762
  dimension "d453" = 44.4679
  dimension "d454" = 12.7
  dimension "d455" = 33.3375
  dimension "d456" = 12.7
  dimension "d457" = 6.35
  dimension "d458" = 12.7
  dimension "d459" = 12.7
  dimension "d460" = 31.75
  dimension "d461" = 19.05
  dimension "d466" = 6.35
  dimension "d467" = 4.9784
  dimension "d468" = 12.7
extrude "Extrusion1" add sketch "Sketch21" along normal blind 3.175
fillet "Fillet1" radius 3.175 2 edges at (-12.7, 1.5875, 69.85) (107.95, 1.5875, -12.7)
equation "\"d105\" = d91"
equation "\"d142\" = d141"
properties part number "Motor Plate" material "Aluminum 6061"
